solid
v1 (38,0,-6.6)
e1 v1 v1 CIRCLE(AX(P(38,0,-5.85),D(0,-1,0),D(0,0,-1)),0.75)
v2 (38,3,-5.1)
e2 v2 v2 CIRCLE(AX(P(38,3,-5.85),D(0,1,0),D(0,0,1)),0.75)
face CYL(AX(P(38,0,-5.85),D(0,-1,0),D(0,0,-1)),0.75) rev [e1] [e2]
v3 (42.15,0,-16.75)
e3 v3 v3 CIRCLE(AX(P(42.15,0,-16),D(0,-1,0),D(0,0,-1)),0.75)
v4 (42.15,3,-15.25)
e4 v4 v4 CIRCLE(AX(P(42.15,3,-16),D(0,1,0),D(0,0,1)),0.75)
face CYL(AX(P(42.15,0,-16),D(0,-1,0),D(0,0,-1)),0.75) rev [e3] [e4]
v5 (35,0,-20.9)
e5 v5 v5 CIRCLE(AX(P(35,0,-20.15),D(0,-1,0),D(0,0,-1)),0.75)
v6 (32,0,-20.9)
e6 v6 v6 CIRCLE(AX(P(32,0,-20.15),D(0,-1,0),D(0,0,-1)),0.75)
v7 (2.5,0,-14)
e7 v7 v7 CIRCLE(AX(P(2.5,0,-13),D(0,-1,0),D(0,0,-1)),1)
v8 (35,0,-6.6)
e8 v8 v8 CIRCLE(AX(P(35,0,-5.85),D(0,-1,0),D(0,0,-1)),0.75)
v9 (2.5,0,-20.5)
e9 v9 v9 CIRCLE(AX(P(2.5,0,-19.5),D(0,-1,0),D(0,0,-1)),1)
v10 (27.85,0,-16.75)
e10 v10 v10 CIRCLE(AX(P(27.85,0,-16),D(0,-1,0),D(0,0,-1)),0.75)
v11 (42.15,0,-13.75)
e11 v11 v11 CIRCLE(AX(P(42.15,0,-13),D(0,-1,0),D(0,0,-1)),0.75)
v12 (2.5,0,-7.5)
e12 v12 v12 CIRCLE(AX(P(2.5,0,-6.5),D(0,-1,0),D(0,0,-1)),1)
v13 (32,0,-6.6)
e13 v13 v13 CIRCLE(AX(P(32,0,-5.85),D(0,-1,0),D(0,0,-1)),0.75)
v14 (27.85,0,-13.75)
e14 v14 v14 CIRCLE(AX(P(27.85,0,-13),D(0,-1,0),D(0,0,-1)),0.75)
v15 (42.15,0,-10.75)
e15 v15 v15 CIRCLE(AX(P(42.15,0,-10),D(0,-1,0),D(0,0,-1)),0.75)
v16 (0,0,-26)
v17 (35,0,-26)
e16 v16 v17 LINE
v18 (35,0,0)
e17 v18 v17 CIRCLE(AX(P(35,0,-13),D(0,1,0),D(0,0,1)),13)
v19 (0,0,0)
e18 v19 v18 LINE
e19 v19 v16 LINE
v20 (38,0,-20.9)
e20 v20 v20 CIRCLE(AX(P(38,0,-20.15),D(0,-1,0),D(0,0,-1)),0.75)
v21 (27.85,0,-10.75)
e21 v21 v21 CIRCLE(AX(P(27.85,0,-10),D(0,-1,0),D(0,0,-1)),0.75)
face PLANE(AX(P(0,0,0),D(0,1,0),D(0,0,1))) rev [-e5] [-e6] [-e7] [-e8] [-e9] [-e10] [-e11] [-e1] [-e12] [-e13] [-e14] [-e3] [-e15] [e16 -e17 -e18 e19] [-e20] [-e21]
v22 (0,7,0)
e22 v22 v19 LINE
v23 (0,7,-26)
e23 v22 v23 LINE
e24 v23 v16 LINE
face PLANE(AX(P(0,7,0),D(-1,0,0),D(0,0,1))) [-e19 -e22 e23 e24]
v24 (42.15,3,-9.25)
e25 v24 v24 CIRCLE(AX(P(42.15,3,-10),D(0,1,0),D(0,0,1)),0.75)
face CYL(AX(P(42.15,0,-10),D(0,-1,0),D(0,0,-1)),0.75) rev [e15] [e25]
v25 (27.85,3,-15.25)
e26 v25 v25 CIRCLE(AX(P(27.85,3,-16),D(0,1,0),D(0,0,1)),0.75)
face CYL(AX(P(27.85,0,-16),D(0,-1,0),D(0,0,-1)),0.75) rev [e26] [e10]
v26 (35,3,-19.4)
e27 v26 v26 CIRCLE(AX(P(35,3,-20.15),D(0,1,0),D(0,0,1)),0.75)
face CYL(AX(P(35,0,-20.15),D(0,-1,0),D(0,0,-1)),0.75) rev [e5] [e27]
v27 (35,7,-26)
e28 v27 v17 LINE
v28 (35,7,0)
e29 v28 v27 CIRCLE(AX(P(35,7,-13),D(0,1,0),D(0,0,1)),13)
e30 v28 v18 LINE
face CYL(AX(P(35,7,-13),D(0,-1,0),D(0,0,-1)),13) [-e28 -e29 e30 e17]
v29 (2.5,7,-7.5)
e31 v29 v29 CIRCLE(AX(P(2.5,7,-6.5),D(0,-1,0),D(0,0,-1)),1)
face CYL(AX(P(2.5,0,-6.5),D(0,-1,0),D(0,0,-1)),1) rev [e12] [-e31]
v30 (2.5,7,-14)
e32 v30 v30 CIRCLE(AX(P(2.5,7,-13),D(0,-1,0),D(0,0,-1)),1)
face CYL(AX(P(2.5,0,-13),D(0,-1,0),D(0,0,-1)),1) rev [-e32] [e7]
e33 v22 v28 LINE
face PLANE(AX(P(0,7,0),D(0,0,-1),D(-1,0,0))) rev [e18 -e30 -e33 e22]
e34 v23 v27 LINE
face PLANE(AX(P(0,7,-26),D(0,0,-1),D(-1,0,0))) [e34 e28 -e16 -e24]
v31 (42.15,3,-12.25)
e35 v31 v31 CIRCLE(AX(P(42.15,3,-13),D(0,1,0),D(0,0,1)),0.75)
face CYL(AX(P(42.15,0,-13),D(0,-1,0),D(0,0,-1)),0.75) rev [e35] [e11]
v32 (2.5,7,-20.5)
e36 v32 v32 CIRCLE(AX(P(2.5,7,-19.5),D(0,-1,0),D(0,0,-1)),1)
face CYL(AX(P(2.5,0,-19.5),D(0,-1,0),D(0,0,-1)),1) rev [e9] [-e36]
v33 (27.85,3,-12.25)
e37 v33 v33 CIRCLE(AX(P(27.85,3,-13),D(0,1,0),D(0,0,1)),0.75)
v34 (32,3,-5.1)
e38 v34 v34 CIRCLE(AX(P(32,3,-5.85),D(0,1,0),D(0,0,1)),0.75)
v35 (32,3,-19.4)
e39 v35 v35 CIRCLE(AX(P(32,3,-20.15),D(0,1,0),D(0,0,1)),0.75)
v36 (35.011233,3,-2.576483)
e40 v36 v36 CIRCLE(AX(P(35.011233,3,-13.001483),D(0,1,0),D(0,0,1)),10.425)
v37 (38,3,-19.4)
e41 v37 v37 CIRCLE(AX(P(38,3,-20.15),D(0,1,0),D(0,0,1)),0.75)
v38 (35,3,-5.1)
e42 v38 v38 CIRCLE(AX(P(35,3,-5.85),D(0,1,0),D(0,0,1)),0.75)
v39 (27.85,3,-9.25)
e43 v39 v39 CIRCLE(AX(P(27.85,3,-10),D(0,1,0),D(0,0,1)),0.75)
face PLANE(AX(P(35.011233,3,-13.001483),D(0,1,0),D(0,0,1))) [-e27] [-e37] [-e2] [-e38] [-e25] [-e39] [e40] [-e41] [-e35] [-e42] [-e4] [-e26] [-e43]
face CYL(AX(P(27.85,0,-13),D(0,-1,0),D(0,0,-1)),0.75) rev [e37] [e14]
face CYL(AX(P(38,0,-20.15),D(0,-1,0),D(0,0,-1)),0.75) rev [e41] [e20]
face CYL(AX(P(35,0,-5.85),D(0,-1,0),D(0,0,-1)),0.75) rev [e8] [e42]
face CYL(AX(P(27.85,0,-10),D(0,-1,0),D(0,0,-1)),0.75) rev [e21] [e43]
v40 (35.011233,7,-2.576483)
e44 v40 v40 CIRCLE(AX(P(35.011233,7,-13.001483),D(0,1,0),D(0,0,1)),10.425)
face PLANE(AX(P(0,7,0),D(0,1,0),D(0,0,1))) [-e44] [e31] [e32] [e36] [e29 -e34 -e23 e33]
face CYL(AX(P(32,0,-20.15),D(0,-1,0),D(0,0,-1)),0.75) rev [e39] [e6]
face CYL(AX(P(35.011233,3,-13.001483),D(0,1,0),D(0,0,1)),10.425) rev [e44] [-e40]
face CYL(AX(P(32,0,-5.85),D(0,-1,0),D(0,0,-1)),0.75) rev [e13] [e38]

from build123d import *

# Parameters (mm, degrees)
BOSS_EXTRUDE1_DEPTH       = 7
HOLE3_START               = 3
HOLE3_OUTLINE_R           = 10.425
HOLE3_DEPTH               = 4
F_2_0MM_DOWEL_HOLE1_D     = 2
F_2_0MM_DOWEL_HOLE1_DEPTH = 7
F_2_0MM_DOWEL_HOLE1_TIP   = 0.600860619
F_1_5MM_DOWEL_HOLE1_D     = 1.5
F_1_5MM_DOWEL_HOLE1_DEPTH = 7
F_1_5MM_DOWEL_HOLE1_TIP   = 0.450645464


# Read off the part's stored shape, not the designer's step: Hole3
with BuildPart() as part:
    # Sketch1 → Boss-Extrude1 (new body)
    with BuildSketch(Plane(origin=(0, 0, 0), x_dir=(1, 0, 0), z_dir=(0, 1, 0))):
        with BuildLine():
            Line((0, 26), (0, 0))
            Line((0, 0), (35, 0))
            ThreePointArc((35, 0), (22, 13), (35, 26))
            Line((35, 26), (0, 26))
        make_face()
        with BuildLine():
            ThreePointArc((35, 26), (22, 13), (35, 0))
            Line((35, 0), (35, 26))
        make_face()
        with BuildLine():
            Line((35, 26), (35, 0))
            ThreePointArc((35, 0), (44.192388155, 3.807611845), (48, 13))
            ThreePointArc((48, 13), (44.192388155, 22.192388155), (35, 26))
        make_face()
    extrude(amount=BOSS_EXTRUDE1_DEPTH)

    # Hole3 outline → Hole3 (cut)
    with BuildSketch(Plane(origin=(0, 0, 0), x_dir=(1, 0, 0), z_dir=(0, 1, 0)).offset(HOLE3_START)):
        with Locations((35.011233351, 13.001482521)):
            Circle(HOLE3_OUTLINE_R)
    extrude(amount=HOLE3_DEPTH, mode=Mode.SUBTRACT)

    # Ø2.0mm Dowel Hole1
    with Locations(Plane(origin=(0, 0, 0), x_dir=(-1, 0, 0), z_dir=(0, -1, 0))):
        with Locations((-2.5, 6.5), (-2.5, 13), (-2.5, 19.5)):
            Hole(F_2_0MM_DOWEL_HOLE1_D / 2, depth=F_2_0MM_DOWEL_HOLE1_DEPTH)
            with Locations((0, 0, -(F_2_0MM_DOWEL_HOLE1_DEPTH + F_2_0MM_DOWEL_HOLE1_TIP / 2))):  # 118° drill point
                Cone(0, F_2_0MM_DOWEL_HOLE1_D / 2, F_2_0MM_DOWEL_HOLE1_TIP, mode=Mode.SUBTRACT)

    # Ø1.5mm Dowel Hole1
    with Locations(Plane(origin=(35, 0, -5.85), x_dir=(0, 0, -1), z_dir=(0, -1, 0))):
        with Locations((0, 0), (0, 3), (0, -3), (4.15, -7.15), (7.15, -7.15), (10.15, -7.15), (4.15, 7.15), (7.15, 7.15), (10.15, 7.15), (14.3, 0), (14.3, -3), (14.3, 3)):
            Hole(F_1_5MM_DOWEL_HOLE1_D / 2, depth=F_1_5MM_DOWEL_HOLE1_DEPTH)
            with Locations((0, 0, -(F_1_5MM_DOWEL_HOLE1_DEPTH + F_1_5MM_DOWEL_HOLE1_TIP / 2))):  # 118° drill point
                Cone(0, F_1_5MM_DOWEL_HOLE1_D / 2, F_1_5MM_DOWEL_HOLE1_TIP, mode=Mode.SUBTRACT)


solid = part.part
